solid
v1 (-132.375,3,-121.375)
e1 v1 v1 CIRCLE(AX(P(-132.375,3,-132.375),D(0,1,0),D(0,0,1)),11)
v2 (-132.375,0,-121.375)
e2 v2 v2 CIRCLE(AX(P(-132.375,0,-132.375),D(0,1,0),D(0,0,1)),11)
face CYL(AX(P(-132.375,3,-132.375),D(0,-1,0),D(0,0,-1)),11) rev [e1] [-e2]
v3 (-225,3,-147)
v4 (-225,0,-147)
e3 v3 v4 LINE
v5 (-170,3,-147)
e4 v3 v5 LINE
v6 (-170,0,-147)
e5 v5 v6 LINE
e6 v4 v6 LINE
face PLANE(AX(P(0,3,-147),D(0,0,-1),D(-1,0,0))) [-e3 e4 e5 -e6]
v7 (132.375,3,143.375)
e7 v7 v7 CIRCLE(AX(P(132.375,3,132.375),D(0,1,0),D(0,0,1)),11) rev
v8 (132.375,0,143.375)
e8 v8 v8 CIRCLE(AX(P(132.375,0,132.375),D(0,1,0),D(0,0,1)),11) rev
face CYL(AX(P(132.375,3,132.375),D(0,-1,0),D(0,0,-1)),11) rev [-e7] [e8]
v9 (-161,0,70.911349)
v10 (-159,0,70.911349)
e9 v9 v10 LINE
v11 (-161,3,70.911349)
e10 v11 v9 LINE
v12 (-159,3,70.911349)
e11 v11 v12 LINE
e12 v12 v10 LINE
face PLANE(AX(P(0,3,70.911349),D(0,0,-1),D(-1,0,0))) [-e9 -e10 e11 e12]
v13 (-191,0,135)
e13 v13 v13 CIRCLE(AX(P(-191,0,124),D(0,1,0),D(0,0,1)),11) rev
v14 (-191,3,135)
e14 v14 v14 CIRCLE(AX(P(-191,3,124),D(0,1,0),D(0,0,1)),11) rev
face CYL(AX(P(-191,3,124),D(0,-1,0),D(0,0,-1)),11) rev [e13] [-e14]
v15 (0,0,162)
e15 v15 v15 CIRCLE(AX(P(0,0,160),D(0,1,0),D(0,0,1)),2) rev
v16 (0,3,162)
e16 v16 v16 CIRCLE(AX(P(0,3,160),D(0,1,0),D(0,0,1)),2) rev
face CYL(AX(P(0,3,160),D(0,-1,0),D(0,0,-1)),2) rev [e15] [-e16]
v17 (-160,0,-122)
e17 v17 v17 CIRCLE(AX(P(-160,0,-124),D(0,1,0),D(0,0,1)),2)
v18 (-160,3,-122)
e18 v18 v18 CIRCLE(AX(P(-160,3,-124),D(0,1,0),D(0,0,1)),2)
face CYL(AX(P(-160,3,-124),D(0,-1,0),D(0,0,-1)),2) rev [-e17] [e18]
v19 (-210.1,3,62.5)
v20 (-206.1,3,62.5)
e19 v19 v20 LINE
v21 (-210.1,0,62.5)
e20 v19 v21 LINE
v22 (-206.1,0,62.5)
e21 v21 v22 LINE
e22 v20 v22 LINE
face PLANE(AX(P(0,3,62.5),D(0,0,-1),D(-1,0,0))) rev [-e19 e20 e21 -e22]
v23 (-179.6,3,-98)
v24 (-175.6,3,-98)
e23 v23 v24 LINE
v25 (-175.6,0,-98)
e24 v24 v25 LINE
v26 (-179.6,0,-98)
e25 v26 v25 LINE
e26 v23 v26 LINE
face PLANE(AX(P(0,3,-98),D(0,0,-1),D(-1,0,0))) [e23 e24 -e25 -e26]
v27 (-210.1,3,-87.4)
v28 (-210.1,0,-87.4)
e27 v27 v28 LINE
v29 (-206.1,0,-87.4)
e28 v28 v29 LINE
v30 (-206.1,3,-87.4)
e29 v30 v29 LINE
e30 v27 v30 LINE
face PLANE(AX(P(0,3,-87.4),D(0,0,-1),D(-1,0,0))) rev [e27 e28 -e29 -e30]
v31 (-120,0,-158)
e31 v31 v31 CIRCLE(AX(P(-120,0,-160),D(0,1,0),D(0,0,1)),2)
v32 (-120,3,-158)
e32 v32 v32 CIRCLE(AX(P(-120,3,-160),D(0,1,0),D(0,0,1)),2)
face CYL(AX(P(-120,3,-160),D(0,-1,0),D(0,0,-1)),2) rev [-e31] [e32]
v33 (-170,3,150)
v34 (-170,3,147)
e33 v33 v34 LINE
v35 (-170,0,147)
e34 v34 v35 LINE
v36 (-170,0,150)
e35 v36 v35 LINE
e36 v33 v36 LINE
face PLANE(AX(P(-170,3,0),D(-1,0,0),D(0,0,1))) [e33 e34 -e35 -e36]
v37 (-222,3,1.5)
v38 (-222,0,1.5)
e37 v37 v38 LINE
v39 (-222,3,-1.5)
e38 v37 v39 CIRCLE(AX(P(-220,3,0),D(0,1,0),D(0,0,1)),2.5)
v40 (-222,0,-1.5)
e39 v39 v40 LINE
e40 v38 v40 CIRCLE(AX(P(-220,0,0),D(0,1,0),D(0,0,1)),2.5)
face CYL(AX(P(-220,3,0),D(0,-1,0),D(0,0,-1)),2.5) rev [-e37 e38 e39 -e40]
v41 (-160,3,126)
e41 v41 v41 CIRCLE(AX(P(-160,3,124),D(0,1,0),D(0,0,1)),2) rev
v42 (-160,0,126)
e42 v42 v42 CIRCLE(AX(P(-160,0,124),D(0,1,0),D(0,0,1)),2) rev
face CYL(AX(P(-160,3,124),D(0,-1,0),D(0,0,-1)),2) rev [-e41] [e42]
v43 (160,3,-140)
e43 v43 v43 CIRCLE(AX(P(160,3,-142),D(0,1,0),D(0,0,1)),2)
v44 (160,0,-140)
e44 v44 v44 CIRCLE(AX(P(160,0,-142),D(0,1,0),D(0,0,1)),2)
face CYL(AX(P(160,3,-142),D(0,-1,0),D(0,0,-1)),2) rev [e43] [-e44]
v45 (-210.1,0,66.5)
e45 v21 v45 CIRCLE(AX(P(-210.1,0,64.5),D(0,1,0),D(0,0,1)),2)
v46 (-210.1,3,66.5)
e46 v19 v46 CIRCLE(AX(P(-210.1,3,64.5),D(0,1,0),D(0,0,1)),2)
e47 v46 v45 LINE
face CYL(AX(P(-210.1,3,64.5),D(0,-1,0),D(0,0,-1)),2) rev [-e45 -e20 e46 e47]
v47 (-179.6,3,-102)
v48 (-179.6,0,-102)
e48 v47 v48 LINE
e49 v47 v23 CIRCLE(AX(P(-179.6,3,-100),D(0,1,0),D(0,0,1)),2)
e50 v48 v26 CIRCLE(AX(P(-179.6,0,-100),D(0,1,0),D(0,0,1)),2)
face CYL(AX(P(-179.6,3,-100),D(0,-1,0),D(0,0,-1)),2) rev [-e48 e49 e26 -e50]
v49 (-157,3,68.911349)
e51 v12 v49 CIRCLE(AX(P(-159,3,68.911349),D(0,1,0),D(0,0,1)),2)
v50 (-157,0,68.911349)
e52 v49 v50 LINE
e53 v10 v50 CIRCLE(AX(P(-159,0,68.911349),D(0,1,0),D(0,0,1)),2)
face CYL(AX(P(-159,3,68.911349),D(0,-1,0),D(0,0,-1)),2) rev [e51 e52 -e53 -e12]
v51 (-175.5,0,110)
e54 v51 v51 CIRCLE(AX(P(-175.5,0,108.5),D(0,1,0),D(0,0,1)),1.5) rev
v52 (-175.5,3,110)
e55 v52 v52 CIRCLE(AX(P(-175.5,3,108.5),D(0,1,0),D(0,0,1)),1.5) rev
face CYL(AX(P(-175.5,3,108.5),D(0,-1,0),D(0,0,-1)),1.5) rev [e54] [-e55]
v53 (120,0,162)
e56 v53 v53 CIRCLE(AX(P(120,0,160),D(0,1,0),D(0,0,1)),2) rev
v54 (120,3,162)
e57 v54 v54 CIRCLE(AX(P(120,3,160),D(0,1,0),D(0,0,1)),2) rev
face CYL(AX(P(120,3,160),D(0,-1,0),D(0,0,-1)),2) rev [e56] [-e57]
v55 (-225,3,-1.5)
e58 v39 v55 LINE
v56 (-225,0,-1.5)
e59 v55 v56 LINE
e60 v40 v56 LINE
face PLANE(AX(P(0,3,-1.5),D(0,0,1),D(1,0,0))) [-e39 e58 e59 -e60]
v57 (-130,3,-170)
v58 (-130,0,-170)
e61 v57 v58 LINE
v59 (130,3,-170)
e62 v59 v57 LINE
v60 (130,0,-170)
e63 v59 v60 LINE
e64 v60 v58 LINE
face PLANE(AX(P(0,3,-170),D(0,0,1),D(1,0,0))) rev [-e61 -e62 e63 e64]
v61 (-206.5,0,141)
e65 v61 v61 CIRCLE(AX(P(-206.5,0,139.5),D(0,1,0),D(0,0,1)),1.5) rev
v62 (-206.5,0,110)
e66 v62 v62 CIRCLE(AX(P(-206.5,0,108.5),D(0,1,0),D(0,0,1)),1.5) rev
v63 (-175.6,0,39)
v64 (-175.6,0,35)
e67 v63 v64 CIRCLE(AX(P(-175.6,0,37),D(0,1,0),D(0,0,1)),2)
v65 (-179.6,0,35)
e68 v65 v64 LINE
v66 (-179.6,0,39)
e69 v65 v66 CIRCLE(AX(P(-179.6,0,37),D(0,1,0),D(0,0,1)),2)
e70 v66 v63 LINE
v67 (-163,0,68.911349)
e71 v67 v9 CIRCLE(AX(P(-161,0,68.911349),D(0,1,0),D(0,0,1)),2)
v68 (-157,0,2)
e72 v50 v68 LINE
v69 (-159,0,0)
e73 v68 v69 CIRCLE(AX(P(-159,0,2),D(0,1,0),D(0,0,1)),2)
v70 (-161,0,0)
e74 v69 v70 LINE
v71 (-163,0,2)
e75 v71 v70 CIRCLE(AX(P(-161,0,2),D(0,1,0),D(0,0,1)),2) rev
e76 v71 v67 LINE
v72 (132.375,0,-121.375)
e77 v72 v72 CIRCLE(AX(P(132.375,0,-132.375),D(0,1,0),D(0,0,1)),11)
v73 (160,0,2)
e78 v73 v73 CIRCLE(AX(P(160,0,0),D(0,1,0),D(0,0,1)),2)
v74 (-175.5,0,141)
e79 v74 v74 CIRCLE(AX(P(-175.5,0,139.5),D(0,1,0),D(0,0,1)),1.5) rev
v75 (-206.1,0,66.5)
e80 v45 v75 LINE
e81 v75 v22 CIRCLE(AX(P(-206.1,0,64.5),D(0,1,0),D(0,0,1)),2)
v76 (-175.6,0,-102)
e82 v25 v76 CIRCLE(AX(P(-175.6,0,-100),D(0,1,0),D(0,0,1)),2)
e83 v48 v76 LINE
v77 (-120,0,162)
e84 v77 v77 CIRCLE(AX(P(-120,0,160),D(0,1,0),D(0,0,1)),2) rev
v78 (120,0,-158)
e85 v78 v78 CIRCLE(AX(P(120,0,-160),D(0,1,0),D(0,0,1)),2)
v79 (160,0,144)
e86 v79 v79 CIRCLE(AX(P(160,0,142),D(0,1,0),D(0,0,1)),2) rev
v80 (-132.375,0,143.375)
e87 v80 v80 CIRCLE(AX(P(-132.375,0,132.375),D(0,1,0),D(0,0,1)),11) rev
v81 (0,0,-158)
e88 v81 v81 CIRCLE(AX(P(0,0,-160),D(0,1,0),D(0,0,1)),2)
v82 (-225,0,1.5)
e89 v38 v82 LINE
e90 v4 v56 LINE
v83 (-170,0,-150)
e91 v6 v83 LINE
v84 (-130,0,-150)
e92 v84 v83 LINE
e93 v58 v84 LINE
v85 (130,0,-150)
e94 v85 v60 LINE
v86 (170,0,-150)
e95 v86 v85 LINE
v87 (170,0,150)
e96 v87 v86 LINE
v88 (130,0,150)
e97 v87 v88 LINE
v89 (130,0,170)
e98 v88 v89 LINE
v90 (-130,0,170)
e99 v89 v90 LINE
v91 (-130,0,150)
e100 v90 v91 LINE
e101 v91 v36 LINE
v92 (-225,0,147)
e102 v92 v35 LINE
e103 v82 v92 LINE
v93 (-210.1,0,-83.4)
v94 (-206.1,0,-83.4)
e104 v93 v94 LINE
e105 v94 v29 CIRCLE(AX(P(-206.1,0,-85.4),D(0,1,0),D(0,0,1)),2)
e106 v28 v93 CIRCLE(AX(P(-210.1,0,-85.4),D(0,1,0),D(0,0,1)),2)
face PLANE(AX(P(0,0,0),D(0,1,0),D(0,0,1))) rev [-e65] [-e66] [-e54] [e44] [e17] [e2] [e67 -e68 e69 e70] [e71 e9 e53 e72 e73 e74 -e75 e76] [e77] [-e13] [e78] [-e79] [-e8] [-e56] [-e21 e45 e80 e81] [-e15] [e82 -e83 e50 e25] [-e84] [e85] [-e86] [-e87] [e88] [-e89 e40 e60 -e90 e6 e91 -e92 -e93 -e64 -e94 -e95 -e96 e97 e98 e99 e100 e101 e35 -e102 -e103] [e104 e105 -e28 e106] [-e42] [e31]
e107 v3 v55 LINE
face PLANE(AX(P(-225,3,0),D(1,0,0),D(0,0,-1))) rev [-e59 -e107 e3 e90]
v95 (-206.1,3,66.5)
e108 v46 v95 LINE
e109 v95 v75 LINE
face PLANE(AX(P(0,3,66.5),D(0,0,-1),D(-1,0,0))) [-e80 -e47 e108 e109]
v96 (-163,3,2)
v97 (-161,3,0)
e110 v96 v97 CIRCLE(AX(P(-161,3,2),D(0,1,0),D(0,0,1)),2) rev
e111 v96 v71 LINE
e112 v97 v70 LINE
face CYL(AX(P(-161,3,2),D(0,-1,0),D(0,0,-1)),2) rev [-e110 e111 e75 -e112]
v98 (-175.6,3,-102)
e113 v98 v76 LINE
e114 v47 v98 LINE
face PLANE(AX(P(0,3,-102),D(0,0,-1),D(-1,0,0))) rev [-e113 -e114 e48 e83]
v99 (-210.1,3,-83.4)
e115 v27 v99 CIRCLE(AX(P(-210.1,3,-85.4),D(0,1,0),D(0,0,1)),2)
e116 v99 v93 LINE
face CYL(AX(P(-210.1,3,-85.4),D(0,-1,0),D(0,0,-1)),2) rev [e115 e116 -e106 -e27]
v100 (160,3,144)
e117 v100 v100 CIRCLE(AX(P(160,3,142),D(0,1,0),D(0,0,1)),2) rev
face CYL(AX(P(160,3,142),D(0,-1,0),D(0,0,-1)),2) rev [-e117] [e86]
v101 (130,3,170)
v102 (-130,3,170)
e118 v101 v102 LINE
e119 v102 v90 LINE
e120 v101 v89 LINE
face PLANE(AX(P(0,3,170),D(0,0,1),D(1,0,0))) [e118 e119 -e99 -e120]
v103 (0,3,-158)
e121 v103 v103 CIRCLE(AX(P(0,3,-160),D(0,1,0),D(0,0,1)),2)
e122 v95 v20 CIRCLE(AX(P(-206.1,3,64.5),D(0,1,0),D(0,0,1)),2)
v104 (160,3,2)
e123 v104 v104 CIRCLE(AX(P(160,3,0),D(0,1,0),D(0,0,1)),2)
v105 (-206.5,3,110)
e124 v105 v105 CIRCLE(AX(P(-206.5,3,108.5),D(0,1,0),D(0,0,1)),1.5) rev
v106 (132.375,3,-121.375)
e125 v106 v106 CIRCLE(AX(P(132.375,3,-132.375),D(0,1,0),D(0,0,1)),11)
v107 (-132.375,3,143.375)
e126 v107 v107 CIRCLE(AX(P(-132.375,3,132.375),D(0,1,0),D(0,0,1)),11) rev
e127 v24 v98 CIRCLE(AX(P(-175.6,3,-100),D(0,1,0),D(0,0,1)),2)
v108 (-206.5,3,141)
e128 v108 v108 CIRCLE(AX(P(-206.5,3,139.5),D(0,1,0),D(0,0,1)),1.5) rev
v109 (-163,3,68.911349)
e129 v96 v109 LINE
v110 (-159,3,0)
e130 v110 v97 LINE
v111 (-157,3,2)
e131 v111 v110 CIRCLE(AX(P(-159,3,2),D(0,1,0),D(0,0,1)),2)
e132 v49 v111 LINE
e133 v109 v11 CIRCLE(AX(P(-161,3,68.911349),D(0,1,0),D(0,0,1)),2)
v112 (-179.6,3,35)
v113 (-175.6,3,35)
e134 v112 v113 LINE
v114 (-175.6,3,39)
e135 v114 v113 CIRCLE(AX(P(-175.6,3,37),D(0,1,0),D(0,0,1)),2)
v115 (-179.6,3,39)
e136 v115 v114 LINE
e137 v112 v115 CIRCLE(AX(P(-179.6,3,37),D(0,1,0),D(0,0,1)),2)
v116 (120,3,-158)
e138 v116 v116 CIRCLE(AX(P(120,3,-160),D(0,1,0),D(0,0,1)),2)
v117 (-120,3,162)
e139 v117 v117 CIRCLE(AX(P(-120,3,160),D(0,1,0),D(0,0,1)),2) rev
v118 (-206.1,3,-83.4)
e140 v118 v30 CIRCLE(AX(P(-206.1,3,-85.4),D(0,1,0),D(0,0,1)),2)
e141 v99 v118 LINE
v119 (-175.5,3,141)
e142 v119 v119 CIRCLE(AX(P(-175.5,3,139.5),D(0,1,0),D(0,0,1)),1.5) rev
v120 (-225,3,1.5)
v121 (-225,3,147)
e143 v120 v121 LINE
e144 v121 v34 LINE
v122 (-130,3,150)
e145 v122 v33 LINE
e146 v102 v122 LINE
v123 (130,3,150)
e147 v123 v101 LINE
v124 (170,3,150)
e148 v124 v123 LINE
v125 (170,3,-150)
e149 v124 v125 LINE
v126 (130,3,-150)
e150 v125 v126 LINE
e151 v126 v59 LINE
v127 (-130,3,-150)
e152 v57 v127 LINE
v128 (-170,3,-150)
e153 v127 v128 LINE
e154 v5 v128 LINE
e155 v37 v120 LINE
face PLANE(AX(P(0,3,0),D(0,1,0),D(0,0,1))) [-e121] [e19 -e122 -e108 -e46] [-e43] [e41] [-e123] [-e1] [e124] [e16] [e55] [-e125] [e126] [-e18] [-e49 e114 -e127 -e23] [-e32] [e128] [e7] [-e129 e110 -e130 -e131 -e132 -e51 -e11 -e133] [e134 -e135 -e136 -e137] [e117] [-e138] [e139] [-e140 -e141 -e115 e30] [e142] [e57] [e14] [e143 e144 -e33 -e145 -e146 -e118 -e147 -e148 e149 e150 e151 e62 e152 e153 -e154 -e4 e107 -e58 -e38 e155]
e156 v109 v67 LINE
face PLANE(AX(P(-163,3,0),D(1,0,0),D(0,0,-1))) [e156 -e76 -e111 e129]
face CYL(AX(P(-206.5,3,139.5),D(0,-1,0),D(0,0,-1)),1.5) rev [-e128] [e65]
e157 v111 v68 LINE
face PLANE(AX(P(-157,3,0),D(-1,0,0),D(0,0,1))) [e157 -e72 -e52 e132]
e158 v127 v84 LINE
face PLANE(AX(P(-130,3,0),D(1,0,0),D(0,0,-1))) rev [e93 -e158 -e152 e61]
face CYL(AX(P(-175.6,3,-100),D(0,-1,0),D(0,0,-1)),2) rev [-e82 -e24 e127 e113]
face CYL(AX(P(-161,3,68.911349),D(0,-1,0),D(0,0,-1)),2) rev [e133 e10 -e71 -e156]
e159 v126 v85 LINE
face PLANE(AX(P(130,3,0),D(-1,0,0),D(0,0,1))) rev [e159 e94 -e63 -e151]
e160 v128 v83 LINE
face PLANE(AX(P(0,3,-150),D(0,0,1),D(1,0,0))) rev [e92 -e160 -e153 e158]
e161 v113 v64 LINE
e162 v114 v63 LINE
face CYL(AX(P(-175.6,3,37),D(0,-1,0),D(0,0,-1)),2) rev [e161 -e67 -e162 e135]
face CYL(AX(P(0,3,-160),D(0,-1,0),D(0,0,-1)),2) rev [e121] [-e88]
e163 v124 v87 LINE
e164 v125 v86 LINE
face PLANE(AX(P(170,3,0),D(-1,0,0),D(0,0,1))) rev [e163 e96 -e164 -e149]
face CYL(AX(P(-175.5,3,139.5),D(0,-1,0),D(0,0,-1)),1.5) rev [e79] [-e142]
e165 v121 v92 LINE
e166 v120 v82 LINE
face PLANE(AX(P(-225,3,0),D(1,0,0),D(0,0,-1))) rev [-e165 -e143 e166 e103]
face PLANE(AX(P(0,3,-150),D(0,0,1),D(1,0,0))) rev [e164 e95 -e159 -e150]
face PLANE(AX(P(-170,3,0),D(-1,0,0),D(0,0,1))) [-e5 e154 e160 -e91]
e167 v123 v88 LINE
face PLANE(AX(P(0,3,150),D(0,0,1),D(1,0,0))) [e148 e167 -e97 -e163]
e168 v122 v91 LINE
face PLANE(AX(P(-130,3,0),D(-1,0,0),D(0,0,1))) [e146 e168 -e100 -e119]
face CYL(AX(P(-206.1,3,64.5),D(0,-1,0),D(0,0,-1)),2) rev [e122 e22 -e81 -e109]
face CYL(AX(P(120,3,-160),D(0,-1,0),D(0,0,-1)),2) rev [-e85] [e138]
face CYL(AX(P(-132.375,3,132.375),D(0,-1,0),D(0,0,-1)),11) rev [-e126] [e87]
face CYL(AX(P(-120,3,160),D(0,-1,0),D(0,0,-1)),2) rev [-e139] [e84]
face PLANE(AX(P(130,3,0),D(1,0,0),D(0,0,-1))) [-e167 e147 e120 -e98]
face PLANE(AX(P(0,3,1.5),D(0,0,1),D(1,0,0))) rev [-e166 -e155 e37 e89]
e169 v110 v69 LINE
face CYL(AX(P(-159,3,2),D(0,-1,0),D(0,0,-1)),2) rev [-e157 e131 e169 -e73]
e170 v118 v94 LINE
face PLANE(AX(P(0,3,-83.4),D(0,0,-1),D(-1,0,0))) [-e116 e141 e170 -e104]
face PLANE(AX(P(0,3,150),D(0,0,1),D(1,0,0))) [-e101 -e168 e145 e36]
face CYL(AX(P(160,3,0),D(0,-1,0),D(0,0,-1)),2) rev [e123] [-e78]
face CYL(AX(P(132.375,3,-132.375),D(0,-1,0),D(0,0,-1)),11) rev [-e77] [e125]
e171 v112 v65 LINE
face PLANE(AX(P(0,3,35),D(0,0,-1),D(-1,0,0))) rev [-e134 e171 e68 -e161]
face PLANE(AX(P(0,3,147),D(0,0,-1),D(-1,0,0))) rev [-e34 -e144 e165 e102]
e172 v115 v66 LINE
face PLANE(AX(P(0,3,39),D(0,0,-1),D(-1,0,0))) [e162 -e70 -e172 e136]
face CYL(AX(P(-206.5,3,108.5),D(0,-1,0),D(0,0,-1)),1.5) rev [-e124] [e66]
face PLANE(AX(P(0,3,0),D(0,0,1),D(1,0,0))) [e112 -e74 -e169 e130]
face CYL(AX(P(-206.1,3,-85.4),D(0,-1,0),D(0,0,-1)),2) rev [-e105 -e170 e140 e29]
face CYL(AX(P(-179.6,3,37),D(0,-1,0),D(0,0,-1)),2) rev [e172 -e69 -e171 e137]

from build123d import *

# Parameters (mm, degrees)
SKETCH1_8_R         = 11
SKETCH1_8_R_2       = 2
SKETCH1_8_R_3       = 1.5
BOSS_EXTRUDE5_DEPTH = 3


with BuildPart() as part:
    # Sketch1<8> → Boss-Extrude5 (new body)
    with BuildSketch(Plane(origin=(0, 0, 0), x_dir=(1, 0, 0), z_dir=(0, 1, 0))):
        with BuildLine():
            Line((130, -150), (170, -150))
            Line((170, -150), (170, 150))
            Line((170, 150), (130, 150))
            Line((130, 150), (130, 170))
            Line((130, 170), (-130, 170))
            Line((-130, 170), (-130, 150))
            Line((-130, 150), (-170, 150))
            Line((-170, 150), (-170, 147))
            Line((-170, 147), (-225, 147))
            Line((-225, 147), (-225, 1.5))
            Line((-225, 1.5), (-222, 1.5))
            ThreePointArc((-222, 1.5), (-217.5, 0), (-222, -1.5))
            Line((-222, -1.5), (-225, -1.5))
            Line((-225, -1.5), (-225, -147))
            Line((-225, -147), (-170, -147))
            Line((-170, -147), (-170, -150))
            Line((-170, -150), (-130, -150))
            Line((-130, -150), (-130, -170))
            Line((-130, -170), (130, -170))
            Line((130, -170), (130, -150))
        make_face()
        with Locations((132.375, -132.375)):
            Circle(SKETCH1_8_R, mode=Mode.SUBTRACT)
        with Locations((132.375, 132.375)):
            Circle(SKETCH1_8_R, mode=Mode.SUBTRACT)
        with Locations((160, -142)):
            Circle(SKETCH1_8_R_2, mode=Mode.SUBTRACT)
        with Locations((160, 0)):
            Circle(SKETCH1_8_R_2, mode=Mode.SUBTRACT)
        with Locations((160, 142)):
            Circle(SKETCH1_8_R_2, mode=Mode.SUBTRACT)
        with Locations((-132.375, 132.375)):
            Circle(SKETCH1_8_R, mode=Mode.SUBTRACT)
        with BuildLine():
            ThreePointArc((-163, -2), (-162.414213562, -0.585786438), (-161, 0))
            Line((-161, 0), (-159, 0))
            ThreePointArc((-159, 0), (-157.585786438, -0.585786438), (-157, -2))
            Line((-157, -2), (-157, -68.911348687))
            ThreePointArc((-157, -68.911348687), (-157.585786438, -70.325562249), (-159, -70.911348687))
            Line((-159, -70.911348687), (-161, -70.911348687))
            ThreePointArc((-161, -70.911348687), (-162.414213562, -70.325562249), (-163, -68.911348687))
            Line((-163, -68.911348687), (-163, -2))
        make_face(mode=Mode.SUBTRACT)
        with Locations((-160, 124)):
            Circle(SKETCH1_8_R_2, mode=Mode.SUBTRACT)
        with Locations((-132.375, -132.375)):
            Circle(SKETCH1_8_R, mode=Mode.SUBTRACT)
        with Locations((-160, -124)):
            Circle(SKETCH1_8_R_2, mode=Mode.SUBTRACT)
        with Locations((0, -160)):
            Circle(SKETCH1_8_R_2, mode=Mode.SUBTRACT)
        with Locations((120, -160)):
            Circle(SKETCH1_8_R_2, mode=Mode.SUBTRACT)
        with Locations((-120, -160)):
            Circle(SKETCH1_8_R_2, mode=Mode.SUBTRACT)
        with Locations((-175.5, -108.5)):
            Circle(SKETCH1_8_R_3, mode=Mode.SUBTRACT)
        with Locations((-206.5, -139.5)):
            Circle(SKETCH1_8_R_3, mode=Mode.SUBTRACT)
        with Locations((-175.5, -139.5)):
            Circle(SKETCH1_8_R_3, mode=Mode.SUBTRACT)
        with Locations((-191, -124)):
            Circle(SKETCH1_8_R, mode=Mode.SUBTRACT)
        with Locations((-206.5, -108.5)):
            Circle(SKETCH1_8_R_3, mode=Mode.SUBTRACT)
        with BuildLine():
            ThreePointArc((-210.1, -66.5), (-212.1, -64.5), (-210.1, -62.5))
            Line((-210.1, -62.5), (-206.1, -62.5))
            ThreePointArc((-206.1, -62.5), (-204.1, -64.5), (-206.1, -66.5))
            Line((-206.1, -66.5), (-210.1, -66.5))
        make_face(mode=Mode.SUBTRACT)
        with BuildLine():
            ThreePointArc((-179.6, -39), (-181.6, -37), (-179.6, -35))
            Line((-179.6, -35), (-175.6, -35))
            ThreePointArc((-175.6, -35), (-173.6, -37), (-175.6, -39))
            Line((-175.6, -39), (-179.6, -39))
        make_face(mode=Mode.SUBTRACT)
        with BuildLine():
            ThreePointArc((-210.1, 83.4), (-212.1, 85.4), (-210.1, 87.4))
            Line((-210.1, 87.4), (-206.1, 87.4))
            ThreePointArc((-206.1, 87.4), (-204.1, 85.4), (-206.1, 83.4))
            Line((-206.1, 83.4), (-210.1, 83.4))
        make_face(mode=Mode.SUBTRACT)
        with BuildLine():
            ThreePointArc((-179.6, 98), (-181.6, 100), (-179.6, 102))
            Line((-179.6, 102), (-175.6, 102))
            ThreePointArc((-175.6, 102), (-173.6, 100), (-175.6, 98))
            Line((-175.6, 98), (-179.6, 98))
        make_face(mode=Mode.SUBTRACT)
        with Locations((0, 160)):
            Circle(SKETCH1_8_R_2, mode=Mode.SUBTRACT)
        with Locations((120, 160)):
            Circle(SKETCH1_8_R_2, mode=Mode.SUBTRACT)
        with Locations((-120, 160)):
            Circle(SKETCH1_8_R_2, mode=Mode.SUBTRACT)
    extrude(amount=BOSS_EXTRUDE5_DEPTH)


solid = part.part
